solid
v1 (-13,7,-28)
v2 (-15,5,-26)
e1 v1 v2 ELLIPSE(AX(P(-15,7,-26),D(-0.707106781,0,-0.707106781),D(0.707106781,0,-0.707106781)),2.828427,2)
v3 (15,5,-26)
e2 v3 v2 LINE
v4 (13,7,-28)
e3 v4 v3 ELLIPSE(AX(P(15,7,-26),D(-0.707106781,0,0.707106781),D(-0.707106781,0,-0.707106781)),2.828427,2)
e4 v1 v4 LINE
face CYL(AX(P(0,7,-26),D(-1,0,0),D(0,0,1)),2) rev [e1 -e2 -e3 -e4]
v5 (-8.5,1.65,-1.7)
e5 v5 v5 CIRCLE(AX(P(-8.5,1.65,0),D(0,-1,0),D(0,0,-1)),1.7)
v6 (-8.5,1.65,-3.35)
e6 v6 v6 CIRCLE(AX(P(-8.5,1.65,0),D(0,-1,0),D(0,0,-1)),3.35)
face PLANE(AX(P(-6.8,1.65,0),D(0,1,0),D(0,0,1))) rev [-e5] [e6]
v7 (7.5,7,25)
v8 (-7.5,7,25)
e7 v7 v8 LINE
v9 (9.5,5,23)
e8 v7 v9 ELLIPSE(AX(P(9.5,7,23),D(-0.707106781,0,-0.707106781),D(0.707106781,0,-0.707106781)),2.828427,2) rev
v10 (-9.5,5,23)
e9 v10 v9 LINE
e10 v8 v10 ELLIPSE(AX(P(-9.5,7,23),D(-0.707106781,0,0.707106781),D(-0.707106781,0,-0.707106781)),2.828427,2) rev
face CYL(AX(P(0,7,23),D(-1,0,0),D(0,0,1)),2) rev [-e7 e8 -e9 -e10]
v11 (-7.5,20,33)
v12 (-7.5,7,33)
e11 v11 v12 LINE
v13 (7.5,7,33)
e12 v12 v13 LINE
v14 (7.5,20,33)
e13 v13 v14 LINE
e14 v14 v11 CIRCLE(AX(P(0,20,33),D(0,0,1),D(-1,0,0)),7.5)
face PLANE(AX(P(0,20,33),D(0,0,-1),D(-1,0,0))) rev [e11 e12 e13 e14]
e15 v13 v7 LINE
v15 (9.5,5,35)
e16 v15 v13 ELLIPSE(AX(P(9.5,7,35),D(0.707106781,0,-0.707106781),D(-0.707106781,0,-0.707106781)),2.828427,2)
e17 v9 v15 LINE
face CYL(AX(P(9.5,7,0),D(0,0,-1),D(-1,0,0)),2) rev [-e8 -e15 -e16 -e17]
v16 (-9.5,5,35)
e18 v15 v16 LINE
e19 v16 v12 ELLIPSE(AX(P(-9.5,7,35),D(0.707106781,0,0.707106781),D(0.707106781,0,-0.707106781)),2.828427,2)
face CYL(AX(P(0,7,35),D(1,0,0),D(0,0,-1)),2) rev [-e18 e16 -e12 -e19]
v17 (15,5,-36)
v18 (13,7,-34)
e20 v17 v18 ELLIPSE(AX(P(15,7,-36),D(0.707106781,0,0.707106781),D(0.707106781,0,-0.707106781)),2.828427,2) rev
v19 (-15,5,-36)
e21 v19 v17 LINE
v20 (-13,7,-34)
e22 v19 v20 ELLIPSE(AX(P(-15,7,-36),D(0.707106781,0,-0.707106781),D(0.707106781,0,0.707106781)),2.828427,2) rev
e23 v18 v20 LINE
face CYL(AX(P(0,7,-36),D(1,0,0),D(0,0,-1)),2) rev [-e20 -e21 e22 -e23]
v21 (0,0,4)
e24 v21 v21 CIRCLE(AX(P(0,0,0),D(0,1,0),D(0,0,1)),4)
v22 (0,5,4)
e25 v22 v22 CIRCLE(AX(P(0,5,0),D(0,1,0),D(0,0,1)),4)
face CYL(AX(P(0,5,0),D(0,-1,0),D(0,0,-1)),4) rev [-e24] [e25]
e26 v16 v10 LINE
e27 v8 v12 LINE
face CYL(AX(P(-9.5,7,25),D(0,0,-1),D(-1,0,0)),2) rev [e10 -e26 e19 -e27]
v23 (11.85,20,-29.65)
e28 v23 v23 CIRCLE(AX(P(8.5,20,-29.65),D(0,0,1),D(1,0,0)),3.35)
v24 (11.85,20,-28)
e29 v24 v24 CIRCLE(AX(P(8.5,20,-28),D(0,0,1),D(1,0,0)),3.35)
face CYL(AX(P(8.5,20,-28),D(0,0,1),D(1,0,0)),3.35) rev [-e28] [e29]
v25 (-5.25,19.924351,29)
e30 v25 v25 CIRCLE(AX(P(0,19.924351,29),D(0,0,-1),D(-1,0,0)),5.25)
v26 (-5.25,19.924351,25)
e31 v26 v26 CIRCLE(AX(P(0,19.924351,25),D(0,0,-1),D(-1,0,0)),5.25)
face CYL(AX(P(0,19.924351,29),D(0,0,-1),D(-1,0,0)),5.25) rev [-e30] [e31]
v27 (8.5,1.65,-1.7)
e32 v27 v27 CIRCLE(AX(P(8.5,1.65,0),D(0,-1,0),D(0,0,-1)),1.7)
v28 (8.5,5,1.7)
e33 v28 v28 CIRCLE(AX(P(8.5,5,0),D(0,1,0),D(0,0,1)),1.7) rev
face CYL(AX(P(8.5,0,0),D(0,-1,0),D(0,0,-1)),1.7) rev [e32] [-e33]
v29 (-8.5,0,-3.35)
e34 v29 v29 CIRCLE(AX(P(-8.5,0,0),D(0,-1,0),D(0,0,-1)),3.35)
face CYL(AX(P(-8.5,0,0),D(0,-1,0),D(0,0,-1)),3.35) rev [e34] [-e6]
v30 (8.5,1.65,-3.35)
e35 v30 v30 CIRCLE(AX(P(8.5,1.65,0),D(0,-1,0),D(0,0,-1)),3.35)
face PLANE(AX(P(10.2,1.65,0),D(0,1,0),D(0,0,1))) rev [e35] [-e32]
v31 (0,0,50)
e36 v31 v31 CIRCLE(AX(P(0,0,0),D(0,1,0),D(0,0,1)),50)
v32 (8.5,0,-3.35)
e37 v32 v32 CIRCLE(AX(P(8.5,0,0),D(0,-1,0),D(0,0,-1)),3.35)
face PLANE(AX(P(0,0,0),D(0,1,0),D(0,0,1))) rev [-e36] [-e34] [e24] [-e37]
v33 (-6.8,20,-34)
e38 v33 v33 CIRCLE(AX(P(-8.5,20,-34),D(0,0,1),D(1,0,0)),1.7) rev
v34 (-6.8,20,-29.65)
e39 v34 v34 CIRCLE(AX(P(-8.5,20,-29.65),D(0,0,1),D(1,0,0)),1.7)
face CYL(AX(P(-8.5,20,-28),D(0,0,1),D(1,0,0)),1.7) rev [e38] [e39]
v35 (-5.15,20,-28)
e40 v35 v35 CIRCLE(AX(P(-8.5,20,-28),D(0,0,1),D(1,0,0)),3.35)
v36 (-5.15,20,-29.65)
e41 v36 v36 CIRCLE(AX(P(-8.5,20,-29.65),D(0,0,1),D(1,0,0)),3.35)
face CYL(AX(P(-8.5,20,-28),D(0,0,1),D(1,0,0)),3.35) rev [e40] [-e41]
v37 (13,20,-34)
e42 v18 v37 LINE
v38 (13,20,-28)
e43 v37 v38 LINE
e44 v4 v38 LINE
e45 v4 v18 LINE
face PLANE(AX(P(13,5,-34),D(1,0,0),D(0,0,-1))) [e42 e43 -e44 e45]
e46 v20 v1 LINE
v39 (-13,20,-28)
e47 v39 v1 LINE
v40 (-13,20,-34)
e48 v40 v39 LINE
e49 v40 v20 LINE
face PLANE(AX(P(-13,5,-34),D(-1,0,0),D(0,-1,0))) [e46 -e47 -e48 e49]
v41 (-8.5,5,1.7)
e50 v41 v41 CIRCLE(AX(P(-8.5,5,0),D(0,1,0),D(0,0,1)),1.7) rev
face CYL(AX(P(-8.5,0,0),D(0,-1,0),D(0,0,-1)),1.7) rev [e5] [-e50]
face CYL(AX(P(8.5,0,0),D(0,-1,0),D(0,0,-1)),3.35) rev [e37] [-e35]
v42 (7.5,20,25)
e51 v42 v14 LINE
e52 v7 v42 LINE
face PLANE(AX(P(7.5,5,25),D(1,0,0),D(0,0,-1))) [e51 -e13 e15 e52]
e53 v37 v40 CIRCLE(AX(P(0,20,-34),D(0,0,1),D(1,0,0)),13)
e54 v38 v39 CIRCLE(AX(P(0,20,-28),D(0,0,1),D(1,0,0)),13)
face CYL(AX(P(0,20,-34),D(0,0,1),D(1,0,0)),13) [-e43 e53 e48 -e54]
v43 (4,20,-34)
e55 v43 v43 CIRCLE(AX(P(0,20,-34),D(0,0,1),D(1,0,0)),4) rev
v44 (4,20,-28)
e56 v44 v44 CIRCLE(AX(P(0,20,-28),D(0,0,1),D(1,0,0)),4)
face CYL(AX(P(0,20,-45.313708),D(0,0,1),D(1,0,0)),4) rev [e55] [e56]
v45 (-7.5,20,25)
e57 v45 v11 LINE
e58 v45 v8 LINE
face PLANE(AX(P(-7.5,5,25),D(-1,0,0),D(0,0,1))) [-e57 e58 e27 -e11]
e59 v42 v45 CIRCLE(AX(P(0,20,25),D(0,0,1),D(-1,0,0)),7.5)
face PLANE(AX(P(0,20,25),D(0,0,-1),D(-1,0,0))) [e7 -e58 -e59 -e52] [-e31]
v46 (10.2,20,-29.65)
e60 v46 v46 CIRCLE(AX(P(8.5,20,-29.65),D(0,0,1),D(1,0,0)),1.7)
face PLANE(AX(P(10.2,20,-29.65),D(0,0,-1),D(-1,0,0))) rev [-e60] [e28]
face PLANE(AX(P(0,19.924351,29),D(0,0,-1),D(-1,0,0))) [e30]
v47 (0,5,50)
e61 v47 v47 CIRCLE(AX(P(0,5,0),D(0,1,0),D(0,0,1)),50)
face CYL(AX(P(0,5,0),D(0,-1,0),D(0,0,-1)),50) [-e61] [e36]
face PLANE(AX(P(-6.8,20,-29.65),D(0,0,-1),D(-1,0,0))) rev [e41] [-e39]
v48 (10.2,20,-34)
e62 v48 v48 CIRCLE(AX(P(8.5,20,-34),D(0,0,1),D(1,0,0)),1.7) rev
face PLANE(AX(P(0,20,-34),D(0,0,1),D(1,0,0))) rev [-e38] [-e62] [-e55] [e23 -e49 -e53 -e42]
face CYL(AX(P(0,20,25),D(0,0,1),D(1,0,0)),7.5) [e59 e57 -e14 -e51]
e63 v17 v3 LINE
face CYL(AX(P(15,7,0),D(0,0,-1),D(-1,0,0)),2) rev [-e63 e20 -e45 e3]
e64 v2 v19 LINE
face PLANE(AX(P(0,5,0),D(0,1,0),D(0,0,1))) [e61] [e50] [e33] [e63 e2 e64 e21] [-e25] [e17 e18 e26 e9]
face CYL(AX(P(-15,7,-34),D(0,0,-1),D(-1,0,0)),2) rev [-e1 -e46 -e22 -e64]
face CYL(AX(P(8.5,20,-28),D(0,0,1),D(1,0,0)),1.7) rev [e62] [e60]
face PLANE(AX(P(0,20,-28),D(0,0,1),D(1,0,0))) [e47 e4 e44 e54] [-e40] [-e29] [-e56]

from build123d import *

# Parameters (mm, degrees)
SKETCH1_R                       = 50
SKETCH1_R_2                     = 4
BOSS_EXTRUDE1_DEPTH             = 5
BOSS_EXTRUDE4_DEPTH             = 6
BOSS_EXTRUDE5_DEPTH             = 8
CBORE_FOR_M3_SBHCS1_D           = 3.4
CBORE_FOR_M3_SBHCS1_CBORE_D     = 6.7
CBORE_FOR_M3_SBHCS1_CBORE_DEPTH = 1.65
CBORE_START                     = -29.65
CBORE_FOR_M3_SBHCS2_OUTLINE_R   = 3.35
CBORE_FOR_M3_SBHCS2_DEPTH       = 1.65
CBORE_START_2                   = -34
CBORE_FOR_M3_SBHCS2_2_OUTLINE_R = 1.7
CBORE_FOR_M3_SBHCS2_2_DEPTH     = 4.35
SKETCH29_R                      = 4
CUT_EXTRUDE1_DEPTH              = 6
SKETCH30_R                      = 5.25
CUT_EXTRUDE2_DEPTH              = 4
FILLET1_R                       = 2


# Read off the part's stored shape, not the designer's step: CBORE for M3 SBHCS2
with BuildPart() as part:
    # Sketch1 → Boss-Extrude1 (new body)
    with BuildSketch(Plane(origin=(0, 0, 0), x_dir=(1, 0, 0), z_dir=(0, 1, 0))):
        with Locations(Location((0, 0, 0), (0, 0, 270))):
            Circle(SKETCH1_R)
        with Locations(Location((0, 0, 0), (0, 0, 270))):
            Circle(SKETCH1_R_2, mode=Mode.SUBTRACT)
    extrude(amount=BOSS_EXTRUDE1_DEPTH)

    # Sketch2 → Boss-Extrude4 (add)
    with BuildSketch(Plane.XY.offset(-28)):
        with BuildLine():
            Line((-13, 5), (-13, 20))
            ThreePointArc((-13, 20), (0, 33), (13, 20))
            Line((13, 20), (13, 5))
            Line((13, 5), (-13, 5))
        make_face()
    extrude(amount=-BOSS_EXTRUDE4_DEPTH)

    # Sketch24 → Boss-Extrude5 (add)
    with BuildSketch(Plane.XY.offset(33)):
        with BuildLine():
            Line((-7.5, 5), (-7.5, 20))
            ThreePointArc((-7.5, 20), (0, 27.5), (7.5, 20))
            Line((7.5, 20), (7.5, 5))
            Line((7.5, 5), (-7.5, 5))
        make_face()
    extrude(amount=-BOSS_EXTRUDE5_DEPTH)

    # CBORE for M3 SBHCS1 (through all)
    with Locations(Plane(origin=(0, 0, 0), x_dir=(-1, 0, 0), z_dir=(0, -1, 0))):
        with Locations((-8.5, 0), (8.5, 0)):
            CounterBoreHole(CBORE_FOR_M3_SBHCS1_D / 2, CBORE_FOR_M3_SBHCS1_CBORE_D / 2, CBORE_FOR_M3_SBHCS1_CBORE_DEPTH)

    # CBORE for M3 SBHCS2 outline → CBORE for M3 SBHCS2 (cut)
    with BuildSketch(Plane.XY.offset(CBORE_START)):
        with Locations((-8.5, 20)):
            Circle(CBORE_FOR_M3_SBHCS2_OUTLINE_R)
        with Locations((8.5, 20)):
            Circle(CBORE_FOR_M3_SBHCS2_OUTLINE_R)
    extrude(amount=CBORE_FOR_M3_SBHCS2_DEPTH, mode=Mode.SUBTRACT)

    # CBORE for M3 SBHCS2 2 outline → CBORE for M3 SBHCS2 2 (cut)
    with BuildSketch(Plane.XY.offset(CBORE_START_2)):
        with Locations((-8.5, 20)):
            Circle(CBORE_FOR_M3_SBHCS2_2_OUTLINE_R)
        with Locations((8.5, 20)):
            Circle(CBORE_FOR_M3_SBHCS2_2_OUTLINE_R)
    extrude(amount=CBORE_FOR_M3_SBHCS2_2_DEPTH, mode=Mode.SUBTRACT)

    # Sketch29 → Cut-Extrude1 (cut)
    with BuildSketch(Plane.XY.offset(-28)):
        with Locations((0, 20)):
            Circle(SKETCH29_R)
    extrude(amount=-CUT_EXTRUDE1_DEPTH, mode=Mode.SUBTRACT)

    # Sketch30 → Cut-Extrude2 (cut)
    with BuildSketch(Plane(origin=(0, 0, 25), x_dir=(-1, 0, 0), z_dir=(0, 0, -1))):
        with Locations((0, 19.924351103)):
            Circle(SKETCH30_R)
    extrude(amount=-CUT_EXTRUDE2_DEPTH, mode=Mode.SUBTRACT)

    # Fillet1
    fillet1_edges = [part.edges().sort_by_distance(p)[0] for p in [
        (0, 5, -34),
        (13, 5, -31),
        (-13, 5, -31),
        (0, 5, -28),
        (0, 5, 25),
        (7.5, 5, 29),
        (-7.5, 5, 29),
        (0, 5, 33),
    ]]
    fillet(fillet1_edges, radius=FILLET1_R)


solid = part.part
